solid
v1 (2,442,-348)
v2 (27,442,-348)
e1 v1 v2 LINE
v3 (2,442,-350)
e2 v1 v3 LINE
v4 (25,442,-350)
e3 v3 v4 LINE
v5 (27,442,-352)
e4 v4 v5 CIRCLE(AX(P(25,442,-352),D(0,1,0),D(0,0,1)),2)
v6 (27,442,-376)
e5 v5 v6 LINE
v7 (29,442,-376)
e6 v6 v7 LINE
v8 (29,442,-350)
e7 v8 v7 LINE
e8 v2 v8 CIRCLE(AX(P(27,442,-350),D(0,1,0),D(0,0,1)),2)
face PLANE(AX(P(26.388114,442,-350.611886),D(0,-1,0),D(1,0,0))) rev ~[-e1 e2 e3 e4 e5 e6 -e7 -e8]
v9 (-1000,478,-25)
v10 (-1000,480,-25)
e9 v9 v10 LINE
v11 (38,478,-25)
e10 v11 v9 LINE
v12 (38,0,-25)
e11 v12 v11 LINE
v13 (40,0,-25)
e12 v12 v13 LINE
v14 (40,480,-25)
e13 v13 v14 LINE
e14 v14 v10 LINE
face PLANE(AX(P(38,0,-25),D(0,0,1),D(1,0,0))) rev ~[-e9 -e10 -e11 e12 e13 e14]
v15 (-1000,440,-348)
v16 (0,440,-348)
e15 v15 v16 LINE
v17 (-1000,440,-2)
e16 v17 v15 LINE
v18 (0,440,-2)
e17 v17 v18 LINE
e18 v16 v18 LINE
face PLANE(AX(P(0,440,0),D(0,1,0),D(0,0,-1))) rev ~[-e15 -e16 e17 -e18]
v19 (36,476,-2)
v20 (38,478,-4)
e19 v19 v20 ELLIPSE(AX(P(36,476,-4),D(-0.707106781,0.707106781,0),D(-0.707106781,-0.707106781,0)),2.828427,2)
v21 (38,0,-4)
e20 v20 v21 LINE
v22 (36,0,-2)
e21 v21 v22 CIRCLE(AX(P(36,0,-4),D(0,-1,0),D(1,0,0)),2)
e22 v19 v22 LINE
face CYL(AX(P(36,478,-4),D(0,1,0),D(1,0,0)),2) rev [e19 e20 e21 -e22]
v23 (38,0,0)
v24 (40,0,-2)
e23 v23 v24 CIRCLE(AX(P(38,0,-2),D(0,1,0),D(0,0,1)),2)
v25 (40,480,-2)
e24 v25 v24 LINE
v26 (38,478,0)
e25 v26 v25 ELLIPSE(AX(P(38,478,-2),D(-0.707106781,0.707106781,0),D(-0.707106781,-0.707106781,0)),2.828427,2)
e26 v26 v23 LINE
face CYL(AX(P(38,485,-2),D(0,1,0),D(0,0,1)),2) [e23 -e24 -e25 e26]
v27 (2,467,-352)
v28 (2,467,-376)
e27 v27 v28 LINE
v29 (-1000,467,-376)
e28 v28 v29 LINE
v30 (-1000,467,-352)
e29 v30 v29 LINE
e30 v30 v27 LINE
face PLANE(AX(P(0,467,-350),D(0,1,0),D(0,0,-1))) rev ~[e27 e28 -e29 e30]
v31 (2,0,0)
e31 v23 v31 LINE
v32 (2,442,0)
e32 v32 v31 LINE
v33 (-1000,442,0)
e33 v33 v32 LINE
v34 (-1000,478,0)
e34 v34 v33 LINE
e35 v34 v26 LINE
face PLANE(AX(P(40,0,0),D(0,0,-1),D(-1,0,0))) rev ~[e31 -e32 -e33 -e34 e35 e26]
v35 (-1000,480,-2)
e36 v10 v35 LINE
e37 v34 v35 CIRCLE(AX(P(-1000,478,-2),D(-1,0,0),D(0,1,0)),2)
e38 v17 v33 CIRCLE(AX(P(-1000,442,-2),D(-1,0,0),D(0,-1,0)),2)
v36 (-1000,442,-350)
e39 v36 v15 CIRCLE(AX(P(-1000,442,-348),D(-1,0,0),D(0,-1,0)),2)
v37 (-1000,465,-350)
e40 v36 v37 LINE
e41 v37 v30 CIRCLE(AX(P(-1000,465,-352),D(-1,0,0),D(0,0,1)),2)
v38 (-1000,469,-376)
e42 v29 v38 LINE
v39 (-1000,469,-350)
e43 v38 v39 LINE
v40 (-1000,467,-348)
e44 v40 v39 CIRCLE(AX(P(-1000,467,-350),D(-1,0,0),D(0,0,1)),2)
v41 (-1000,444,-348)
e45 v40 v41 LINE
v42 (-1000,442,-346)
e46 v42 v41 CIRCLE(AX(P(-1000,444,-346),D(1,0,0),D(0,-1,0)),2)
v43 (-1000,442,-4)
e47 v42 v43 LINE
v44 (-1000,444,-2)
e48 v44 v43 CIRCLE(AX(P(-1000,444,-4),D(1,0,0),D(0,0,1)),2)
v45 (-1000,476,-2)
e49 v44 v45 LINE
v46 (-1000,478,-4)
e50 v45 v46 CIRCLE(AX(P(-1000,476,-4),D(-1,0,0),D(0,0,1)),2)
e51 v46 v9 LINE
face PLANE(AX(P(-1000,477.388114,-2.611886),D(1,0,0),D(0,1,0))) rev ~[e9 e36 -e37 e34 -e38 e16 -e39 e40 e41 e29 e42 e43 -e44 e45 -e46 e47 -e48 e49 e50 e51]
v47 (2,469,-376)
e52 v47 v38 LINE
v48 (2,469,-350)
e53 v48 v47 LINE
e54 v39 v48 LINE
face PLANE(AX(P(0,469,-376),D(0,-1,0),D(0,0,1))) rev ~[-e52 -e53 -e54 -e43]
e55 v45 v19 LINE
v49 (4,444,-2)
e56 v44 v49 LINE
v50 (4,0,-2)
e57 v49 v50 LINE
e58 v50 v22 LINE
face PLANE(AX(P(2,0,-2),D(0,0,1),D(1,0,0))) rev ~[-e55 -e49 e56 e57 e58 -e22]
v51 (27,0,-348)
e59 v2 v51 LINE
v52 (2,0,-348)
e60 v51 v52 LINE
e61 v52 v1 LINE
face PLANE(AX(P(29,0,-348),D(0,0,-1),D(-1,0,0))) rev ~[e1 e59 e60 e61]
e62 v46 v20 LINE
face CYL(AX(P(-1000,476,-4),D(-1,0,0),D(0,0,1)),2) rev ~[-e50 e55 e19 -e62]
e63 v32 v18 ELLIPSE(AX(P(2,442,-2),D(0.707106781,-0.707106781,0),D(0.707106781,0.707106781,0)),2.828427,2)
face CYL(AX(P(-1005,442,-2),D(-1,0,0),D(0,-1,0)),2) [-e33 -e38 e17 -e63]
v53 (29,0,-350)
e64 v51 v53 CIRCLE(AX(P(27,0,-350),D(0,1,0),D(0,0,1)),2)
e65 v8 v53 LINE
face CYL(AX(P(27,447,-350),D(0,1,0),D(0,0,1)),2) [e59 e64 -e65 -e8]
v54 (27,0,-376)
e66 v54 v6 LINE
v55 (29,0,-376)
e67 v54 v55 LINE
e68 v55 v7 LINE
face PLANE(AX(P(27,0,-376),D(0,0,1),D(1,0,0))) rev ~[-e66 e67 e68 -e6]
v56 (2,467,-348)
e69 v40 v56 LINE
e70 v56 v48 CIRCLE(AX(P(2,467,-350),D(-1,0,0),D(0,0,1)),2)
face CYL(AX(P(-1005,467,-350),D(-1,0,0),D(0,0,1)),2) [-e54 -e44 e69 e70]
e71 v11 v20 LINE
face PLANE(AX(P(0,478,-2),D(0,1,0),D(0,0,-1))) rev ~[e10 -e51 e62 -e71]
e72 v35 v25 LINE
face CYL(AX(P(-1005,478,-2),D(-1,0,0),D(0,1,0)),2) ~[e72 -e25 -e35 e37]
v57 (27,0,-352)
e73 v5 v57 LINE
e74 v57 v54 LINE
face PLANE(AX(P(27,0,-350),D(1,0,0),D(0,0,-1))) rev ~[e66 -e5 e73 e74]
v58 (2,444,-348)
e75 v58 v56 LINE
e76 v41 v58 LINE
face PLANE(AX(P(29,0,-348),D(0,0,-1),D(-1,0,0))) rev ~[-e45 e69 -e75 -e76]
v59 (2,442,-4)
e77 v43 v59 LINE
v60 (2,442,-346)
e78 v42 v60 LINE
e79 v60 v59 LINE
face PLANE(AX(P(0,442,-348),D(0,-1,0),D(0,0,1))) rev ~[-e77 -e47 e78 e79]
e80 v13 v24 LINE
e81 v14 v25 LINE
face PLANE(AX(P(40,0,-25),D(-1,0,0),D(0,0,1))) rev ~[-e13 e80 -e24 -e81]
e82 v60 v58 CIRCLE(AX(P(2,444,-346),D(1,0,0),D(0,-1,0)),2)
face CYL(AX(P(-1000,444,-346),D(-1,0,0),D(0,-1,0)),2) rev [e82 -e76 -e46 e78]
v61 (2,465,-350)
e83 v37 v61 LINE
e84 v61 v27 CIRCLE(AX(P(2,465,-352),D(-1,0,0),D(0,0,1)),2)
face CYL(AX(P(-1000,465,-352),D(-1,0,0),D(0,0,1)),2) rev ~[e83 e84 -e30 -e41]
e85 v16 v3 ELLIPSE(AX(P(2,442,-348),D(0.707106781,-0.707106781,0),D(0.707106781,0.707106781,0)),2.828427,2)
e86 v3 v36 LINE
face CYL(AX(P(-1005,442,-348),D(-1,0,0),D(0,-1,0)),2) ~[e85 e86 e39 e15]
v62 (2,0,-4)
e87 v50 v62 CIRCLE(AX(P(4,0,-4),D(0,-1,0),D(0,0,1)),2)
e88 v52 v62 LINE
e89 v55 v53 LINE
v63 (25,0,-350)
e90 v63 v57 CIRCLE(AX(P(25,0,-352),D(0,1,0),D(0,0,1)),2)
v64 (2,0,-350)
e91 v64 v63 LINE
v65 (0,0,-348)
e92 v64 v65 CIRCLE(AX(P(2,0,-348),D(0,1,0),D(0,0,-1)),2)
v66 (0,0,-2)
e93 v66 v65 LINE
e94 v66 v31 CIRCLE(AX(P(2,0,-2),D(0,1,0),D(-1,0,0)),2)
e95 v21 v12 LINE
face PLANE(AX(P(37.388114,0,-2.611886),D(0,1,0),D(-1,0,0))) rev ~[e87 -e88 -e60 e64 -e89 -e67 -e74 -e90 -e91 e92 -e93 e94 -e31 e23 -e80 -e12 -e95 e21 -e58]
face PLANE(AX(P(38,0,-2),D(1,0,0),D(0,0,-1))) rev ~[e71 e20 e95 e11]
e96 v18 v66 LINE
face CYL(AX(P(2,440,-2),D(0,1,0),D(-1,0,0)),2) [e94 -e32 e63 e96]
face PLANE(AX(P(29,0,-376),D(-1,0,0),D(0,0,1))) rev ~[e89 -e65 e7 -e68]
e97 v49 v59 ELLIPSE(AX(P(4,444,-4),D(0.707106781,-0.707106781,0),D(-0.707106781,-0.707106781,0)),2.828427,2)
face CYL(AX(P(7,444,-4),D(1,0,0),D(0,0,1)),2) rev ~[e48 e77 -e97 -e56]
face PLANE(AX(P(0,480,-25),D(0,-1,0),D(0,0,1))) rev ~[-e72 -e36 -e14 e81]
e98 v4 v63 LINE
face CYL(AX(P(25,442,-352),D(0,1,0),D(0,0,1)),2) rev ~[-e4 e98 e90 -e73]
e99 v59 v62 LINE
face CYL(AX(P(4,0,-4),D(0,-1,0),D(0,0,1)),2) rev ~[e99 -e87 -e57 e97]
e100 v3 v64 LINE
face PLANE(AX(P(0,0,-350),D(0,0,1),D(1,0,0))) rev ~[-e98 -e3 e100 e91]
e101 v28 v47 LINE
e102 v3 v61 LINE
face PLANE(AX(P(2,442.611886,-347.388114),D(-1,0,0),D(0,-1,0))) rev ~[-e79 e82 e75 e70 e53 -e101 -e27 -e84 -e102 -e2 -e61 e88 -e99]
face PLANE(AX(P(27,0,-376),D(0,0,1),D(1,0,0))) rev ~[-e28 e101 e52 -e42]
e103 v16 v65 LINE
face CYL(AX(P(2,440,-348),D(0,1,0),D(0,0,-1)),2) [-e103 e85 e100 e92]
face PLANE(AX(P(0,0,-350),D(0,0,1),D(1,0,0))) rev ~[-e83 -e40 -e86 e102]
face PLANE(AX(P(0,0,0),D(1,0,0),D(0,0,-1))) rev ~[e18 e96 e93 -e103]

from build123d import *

# Parameters (mm, degrees)
F3_W         = 27
F3_H         = 27
F4_DEPTH     = 30
F5_T1_DEPTH  = 1002
F5_T3_DEPTH  = 1038
F5_T5_DEPTH  = 442
F5_T7_DEPTH  = 478
F5_T13_DEPTH = 447
F5_T17_DEPTH = 1007
F5_T20_DEPTH = 1012
F5_T22_DEPTH = 1050
F5_T24_DEPTH = 1005
F5_T26_DEPTH = 445
F5_T28_DEPTH = 490
F5_T30_DEPTH = 452
F5_T36_DEPTH = 1010
F5_T40_DEPTH = 450
F5_T47_DEPTH = 1010
F5_T51_DEPTH = 450


# Not quite as in the source:
# - a fillet or chamfer that OpenCascade refuses, or shapes differently, is made with other operations: its cross-section is extruded or revolved along the edge and cut away or added


with BuildPart() as f2:
    # F2: sweep along a path in F1
    with BuildLine(Plane.XY) as f2_path:
        Line((0, 0), (0, 440))
        Line((0, 440), (-1000, 440))
    # F0 (on Front) → F2 (sweep)
    with BuildSketch(Plane.XZ):
        Polygon((38, -2), (38, -25), (40, -25), (40, 0), (0, 0), (0, -350), (27, -350), (27, -376), (29, -376), (29, -348), (2, -348), (2, -2), align=None)
    sweep(path=f2_path.line, transition=Transition.RIGHT)

    # F3 (on face) → F4 (cut)
    with BuildSketch(Plane.XY.offset(-348)):
        with Locations((15.5, 455.5)):
            Rectangle(F3_W, F3_H)
    extrude(amount=-F4_DEPTH, mode=Mode.SUBTRACT)

    # F5: fillet of radius 2 on 15 edges, made by hand

    # F5_s2 → F5_t1 (join)
    with BuildSketch(Plane.YZ.offset(-1000)):
        with BuildLine():
            ThreePointArc((442, -346), (442.5857864376, -347.4142135624), (444, -348))
            Line((444, -348), (442, -348))
            Line((442, -348), (442, -346))
        make_face()
        with BuildLine():
            ThreePointArc((465, -350), (466.4142135624, -350.5857864376), (467, -352))
            Line((467, -352), (467, -350))
            Line((467, -350), (465, -350))
        make_face()
        with BuildLine():
            ThreePointArc((444, -2), (442.5857864376, -2.5857864376), (442, -4))
            Line((442, -4), (442, -2))
            Line((442, -2), (444, -2))
        make_face()
    extrude(amount=F5_T1_DEPTH)

    # F5_s4 → F5_t3 (join)
    with BuildSketch(Plane.YZ.offset(-1000)):
        with BuildLine():
            ThreePointArc((476, -2), (477.4142135624, -2.5857864376), (478, -4))
            Line((478, -4), (478, -2))
            Line((478, -2), (476, -2))
        make_face()
    extrude(amount=F5_T3_DEPTH)

    # F5_s6 → F5_t5 (join)
    with BuildSketch(Plane.XZ.offset(-442)):
        with BuildLine():
            ThreePointArc((25, -350), (26.4142135624, -350.5857864376), (27, -352))
            Line((27, -352), (27, -350))
            Line((27, -350), (25, -350))
        make_face()
        with BuildLine():
            ThreePointArc((4, -2), (2.5857864376, -2.5857864376), (2, -4))
            Line((2, -4), (2, -2))
            Line((2, -2), (4, -2))
        make_face()
    extrude(amount=F5_T5_DEPTH)

    # F5_s8 → F5_t7 (join)
    with BuildSketch(Plane.XZ.offset(-478)):
        with BuildLine():
            ThreePointArc((38, -4), (37.4142135624, -2.5857864376), (36, -2))
            Line((36, -2), (38, -2))
            Line((38, -2), (38, -4))
        make_face()
    extrude(amount=F5_T7_DEPTH)


with BuildPart() as f5_tool11:
    # F5_s12 → F5_t13 (new body)
    with BuildSketch(Plane.XZ):
        with BuildLine():
            ThreePointArc((4, -2), (2.5857864376, -2.5857864376), (2, -4))
            Line((2, -4), (2, -2))
            Line((2, -2), (4, -2))
        make_face()
    extrude(amount=-F5_T13_DEPTH)

    split(bisect_by=Plane.XZ.offset(-442), keep=Keep.BOTTOM)


with BuildPart() as f5_tool15:
    # F5_s16 → F5_t17 (new body)
    with BuildSketch(Plane.YZ.offset(7)):
        with BuildLine():
            ThreePointArc((444, -2), (442.5857864376, -2.5857864376), (442, -4))
            Line((442, -4), (442, -2))
            Line((442, -2), (444, -2))
        make_face()
    extrude(amount=-F5_T17_DEPTH)

    split(bisect_by=Plane.YZ.offset(2), keep=Keep.TOP)


with BuildPart() as f5_tool11_1:
    add(f5_tool11.part)

    # F5_t19: intersect F5_tool15
    add(f5_tool15.part, mode=Mode.INTERSECT)


with BuildPart() as f2_1:
    add(f2.part)

    # F5_t9: union F5_tool11
    add(f5_tool11_1.part)

    # F5_s21 → F5_t20 (cut)
    with BuildSketch(Plane.YZ.offset(-1005)):
        with BuildLine():
            ThreePointArc((467, -348), (468.4142135624, -348.5857864376), (469, -350))
            Line((469, -350), (469, -348))
            Line((469, -348), (467, -348))
        make_face()
    extrude(amount=F5_T20_DEPTH, mode=Mode.SUBTRACT)

    # F5_s23 → F5_t22 (cut)
    with BuildSketch(Plane.YZ.offset(-1005)):
        with BuildLine():
            ThreePointArc((480, -2), (479.4142135624, -0.5857864376), (478, 0))
            Line((478, 0), (480, 0))
            Line((480, 0), (480, -2))
        make_face()
    extrude(amount=F5_T22_DEPTH, mode=Mode.SUBTRACT)

    # F5_s25 → F5_t24 (cut)
    with BuildSketch(Plane.YZ.offset(-1005)):
        with BuildLine():
            ThreePointArc((440, -2), (440.5857864376, -0.5857864376), (442, 0))
            Line((442, 0), (440, 0))
            Line((440, 0), (440, -2))
        make_face()
        with BuildLine():
            ThreePointArc((440, -348), (440.5857864376, -349.4142135624), (442, -350))
            Line((442, -350), (440, -350))
            Line((440, -350), (440, -348))
        make_face()
    extrude(amount=F5_T24_DEPTH, mode=Mode.SUBTRACT)

    # F5_s27 → F5_t26 (cut)
    with BuildSketch(Plane.XZ.offset(-440)):
        with BuildLine():
            ThreePointArc((0, -2), (0.5857864376, -0.5857864376), (2, 0))
            Line((2, 0), (0, 0))
            Line((0, 0), (0, -2))
        make_face()
        with BuildLine():
            ThreePointArc((2, -350), (0.5857864376, -349.4142135624), (0, -348))
            Line((0, -348), (0, -350))
            Line((0, -350), (2, -350))
        make_face()
    extrude(amount=F5_T26_DEPTH, mode=Mode.SUBTRACT)

    # F5_s29 → F5_t28 (cut)
    with BuildSketch(Plane.XZ.offset(-485)):
        with BuildLine():
            ThreePointArc((38, 0), (39.4142135624, -0.5857864376), (40, -2))
            Line((40, -2), (40, 0))
            Line((40, 0), (38, 0))
        make_face()
    extrude(amount=F5_T28_DEPTH, mode=Mode.SUBTRACT)

    # F5_s31 → F5_t30 (cut)
    with BuildSketch(Plane.XZ.offset(-447)):
        with BuildLine():
            ThreePointArc((27, -348), (28.4142135624, -348.5857864376), (29, -350))
            Line((29, -350), (29, -348))
            Line((29, -348), (27, -348))
        make_face()
    extrude(amount=F5_T30_DEPTH, mode=Mode.SUBTRACT)


with BuildPart() as f5_tool34:
    # F5_s35 → F5_t36 (new body)
    with BuildSketch(Plane.YZ.offset(5)):
        with BuildLine():
            ThreePointArc((440, -2), (440.5857864376, -0.5857864376), (442, 0))
            Line((442, 0), (440, 0))
            Line((440, 0), (440, -2))
        make_face()
    extrude(amount=-F5_T36_DEPTH)

    split(bisect_by=Plane.YZ, keep=Keep.TOP)


with BuildPart() as f5_tool38:
    # F5_s39 → F5_t40 (new body)
    with BuildSketch(Plane.XZ.offset(5)):
        with BuildLine():
            ThreePointArc((0, -2), (0.5857864376, -0.5857864376), (2, 0))
            Line((2, 0), (0, 0))
            Line((0, 0), (0, -2))
        make_face()
    extrude(amount=-F5_T40_DEPTH)

    split(bisect_by=Plane.XZ.offset(-440), keep=Keep.BOTTOM)


with BuildPart() as f5_tool34_1:
    add(f5_tool34.part)

    # F5_t42: intersect F5_tool38
    add(f5_tool38.part, mode=Mode.INTERSECT)


with BuildPart() as f2_2:
    add(f2_1.part)

    # F5_t32: cut F5_tool34
    add(f5_tool34_1.part, mode=Mode.SUBTRACT)


with BuildPart() as f5_tool45:
    # F5_s46 → F5_t47 (new body)
    with BuildSketch(Plane.YZ.offset(5)):
        with BuildLine():
            ThreePointArc((440, -348), (440.5857864376, -349.4142135624), (442, -350))
            Line((442, -350), (440, -350))
            Line((440, -350), (440, -348))
        make_face()
    extrude(amount=-F5_T47_DEPTH)

    split(bisect_by=Plane.YZ, keep=Keep.TOP)


with BuildPart() as f5_tool49:
    # F5_s50 → F5_t51 (new body)
    with BuildSketch(Plane.XZ.offset(5)):
        with BuildLine():
            ThreePointArc((2, -350), (0.5857864376, -349.4142135624), (0, -348))
            Line((0, -348), (0, -350))
            Line((0, -350), (2, -350))
        make_face()
    extrude(amount=-F5_T51_DEPTH)

    split(bisect_by=Plane.XZ.offset(-440), keep=Keep.BOTTOM)


with BuildPart() as f5_tool45_1:
    add(f5_tool45.part)

    # F5_t53: intersect F5_tool49
    add(f5_tool49.part, mode=Mode.INTERSECT)


with BuildPart() as f2_3:
    add(f2_2.part)

    # F5_t43: cut F5_tool45
    add(f5_tool45_1.part, mode=Mode.SUBTRACT)


solid = f2_3.part
